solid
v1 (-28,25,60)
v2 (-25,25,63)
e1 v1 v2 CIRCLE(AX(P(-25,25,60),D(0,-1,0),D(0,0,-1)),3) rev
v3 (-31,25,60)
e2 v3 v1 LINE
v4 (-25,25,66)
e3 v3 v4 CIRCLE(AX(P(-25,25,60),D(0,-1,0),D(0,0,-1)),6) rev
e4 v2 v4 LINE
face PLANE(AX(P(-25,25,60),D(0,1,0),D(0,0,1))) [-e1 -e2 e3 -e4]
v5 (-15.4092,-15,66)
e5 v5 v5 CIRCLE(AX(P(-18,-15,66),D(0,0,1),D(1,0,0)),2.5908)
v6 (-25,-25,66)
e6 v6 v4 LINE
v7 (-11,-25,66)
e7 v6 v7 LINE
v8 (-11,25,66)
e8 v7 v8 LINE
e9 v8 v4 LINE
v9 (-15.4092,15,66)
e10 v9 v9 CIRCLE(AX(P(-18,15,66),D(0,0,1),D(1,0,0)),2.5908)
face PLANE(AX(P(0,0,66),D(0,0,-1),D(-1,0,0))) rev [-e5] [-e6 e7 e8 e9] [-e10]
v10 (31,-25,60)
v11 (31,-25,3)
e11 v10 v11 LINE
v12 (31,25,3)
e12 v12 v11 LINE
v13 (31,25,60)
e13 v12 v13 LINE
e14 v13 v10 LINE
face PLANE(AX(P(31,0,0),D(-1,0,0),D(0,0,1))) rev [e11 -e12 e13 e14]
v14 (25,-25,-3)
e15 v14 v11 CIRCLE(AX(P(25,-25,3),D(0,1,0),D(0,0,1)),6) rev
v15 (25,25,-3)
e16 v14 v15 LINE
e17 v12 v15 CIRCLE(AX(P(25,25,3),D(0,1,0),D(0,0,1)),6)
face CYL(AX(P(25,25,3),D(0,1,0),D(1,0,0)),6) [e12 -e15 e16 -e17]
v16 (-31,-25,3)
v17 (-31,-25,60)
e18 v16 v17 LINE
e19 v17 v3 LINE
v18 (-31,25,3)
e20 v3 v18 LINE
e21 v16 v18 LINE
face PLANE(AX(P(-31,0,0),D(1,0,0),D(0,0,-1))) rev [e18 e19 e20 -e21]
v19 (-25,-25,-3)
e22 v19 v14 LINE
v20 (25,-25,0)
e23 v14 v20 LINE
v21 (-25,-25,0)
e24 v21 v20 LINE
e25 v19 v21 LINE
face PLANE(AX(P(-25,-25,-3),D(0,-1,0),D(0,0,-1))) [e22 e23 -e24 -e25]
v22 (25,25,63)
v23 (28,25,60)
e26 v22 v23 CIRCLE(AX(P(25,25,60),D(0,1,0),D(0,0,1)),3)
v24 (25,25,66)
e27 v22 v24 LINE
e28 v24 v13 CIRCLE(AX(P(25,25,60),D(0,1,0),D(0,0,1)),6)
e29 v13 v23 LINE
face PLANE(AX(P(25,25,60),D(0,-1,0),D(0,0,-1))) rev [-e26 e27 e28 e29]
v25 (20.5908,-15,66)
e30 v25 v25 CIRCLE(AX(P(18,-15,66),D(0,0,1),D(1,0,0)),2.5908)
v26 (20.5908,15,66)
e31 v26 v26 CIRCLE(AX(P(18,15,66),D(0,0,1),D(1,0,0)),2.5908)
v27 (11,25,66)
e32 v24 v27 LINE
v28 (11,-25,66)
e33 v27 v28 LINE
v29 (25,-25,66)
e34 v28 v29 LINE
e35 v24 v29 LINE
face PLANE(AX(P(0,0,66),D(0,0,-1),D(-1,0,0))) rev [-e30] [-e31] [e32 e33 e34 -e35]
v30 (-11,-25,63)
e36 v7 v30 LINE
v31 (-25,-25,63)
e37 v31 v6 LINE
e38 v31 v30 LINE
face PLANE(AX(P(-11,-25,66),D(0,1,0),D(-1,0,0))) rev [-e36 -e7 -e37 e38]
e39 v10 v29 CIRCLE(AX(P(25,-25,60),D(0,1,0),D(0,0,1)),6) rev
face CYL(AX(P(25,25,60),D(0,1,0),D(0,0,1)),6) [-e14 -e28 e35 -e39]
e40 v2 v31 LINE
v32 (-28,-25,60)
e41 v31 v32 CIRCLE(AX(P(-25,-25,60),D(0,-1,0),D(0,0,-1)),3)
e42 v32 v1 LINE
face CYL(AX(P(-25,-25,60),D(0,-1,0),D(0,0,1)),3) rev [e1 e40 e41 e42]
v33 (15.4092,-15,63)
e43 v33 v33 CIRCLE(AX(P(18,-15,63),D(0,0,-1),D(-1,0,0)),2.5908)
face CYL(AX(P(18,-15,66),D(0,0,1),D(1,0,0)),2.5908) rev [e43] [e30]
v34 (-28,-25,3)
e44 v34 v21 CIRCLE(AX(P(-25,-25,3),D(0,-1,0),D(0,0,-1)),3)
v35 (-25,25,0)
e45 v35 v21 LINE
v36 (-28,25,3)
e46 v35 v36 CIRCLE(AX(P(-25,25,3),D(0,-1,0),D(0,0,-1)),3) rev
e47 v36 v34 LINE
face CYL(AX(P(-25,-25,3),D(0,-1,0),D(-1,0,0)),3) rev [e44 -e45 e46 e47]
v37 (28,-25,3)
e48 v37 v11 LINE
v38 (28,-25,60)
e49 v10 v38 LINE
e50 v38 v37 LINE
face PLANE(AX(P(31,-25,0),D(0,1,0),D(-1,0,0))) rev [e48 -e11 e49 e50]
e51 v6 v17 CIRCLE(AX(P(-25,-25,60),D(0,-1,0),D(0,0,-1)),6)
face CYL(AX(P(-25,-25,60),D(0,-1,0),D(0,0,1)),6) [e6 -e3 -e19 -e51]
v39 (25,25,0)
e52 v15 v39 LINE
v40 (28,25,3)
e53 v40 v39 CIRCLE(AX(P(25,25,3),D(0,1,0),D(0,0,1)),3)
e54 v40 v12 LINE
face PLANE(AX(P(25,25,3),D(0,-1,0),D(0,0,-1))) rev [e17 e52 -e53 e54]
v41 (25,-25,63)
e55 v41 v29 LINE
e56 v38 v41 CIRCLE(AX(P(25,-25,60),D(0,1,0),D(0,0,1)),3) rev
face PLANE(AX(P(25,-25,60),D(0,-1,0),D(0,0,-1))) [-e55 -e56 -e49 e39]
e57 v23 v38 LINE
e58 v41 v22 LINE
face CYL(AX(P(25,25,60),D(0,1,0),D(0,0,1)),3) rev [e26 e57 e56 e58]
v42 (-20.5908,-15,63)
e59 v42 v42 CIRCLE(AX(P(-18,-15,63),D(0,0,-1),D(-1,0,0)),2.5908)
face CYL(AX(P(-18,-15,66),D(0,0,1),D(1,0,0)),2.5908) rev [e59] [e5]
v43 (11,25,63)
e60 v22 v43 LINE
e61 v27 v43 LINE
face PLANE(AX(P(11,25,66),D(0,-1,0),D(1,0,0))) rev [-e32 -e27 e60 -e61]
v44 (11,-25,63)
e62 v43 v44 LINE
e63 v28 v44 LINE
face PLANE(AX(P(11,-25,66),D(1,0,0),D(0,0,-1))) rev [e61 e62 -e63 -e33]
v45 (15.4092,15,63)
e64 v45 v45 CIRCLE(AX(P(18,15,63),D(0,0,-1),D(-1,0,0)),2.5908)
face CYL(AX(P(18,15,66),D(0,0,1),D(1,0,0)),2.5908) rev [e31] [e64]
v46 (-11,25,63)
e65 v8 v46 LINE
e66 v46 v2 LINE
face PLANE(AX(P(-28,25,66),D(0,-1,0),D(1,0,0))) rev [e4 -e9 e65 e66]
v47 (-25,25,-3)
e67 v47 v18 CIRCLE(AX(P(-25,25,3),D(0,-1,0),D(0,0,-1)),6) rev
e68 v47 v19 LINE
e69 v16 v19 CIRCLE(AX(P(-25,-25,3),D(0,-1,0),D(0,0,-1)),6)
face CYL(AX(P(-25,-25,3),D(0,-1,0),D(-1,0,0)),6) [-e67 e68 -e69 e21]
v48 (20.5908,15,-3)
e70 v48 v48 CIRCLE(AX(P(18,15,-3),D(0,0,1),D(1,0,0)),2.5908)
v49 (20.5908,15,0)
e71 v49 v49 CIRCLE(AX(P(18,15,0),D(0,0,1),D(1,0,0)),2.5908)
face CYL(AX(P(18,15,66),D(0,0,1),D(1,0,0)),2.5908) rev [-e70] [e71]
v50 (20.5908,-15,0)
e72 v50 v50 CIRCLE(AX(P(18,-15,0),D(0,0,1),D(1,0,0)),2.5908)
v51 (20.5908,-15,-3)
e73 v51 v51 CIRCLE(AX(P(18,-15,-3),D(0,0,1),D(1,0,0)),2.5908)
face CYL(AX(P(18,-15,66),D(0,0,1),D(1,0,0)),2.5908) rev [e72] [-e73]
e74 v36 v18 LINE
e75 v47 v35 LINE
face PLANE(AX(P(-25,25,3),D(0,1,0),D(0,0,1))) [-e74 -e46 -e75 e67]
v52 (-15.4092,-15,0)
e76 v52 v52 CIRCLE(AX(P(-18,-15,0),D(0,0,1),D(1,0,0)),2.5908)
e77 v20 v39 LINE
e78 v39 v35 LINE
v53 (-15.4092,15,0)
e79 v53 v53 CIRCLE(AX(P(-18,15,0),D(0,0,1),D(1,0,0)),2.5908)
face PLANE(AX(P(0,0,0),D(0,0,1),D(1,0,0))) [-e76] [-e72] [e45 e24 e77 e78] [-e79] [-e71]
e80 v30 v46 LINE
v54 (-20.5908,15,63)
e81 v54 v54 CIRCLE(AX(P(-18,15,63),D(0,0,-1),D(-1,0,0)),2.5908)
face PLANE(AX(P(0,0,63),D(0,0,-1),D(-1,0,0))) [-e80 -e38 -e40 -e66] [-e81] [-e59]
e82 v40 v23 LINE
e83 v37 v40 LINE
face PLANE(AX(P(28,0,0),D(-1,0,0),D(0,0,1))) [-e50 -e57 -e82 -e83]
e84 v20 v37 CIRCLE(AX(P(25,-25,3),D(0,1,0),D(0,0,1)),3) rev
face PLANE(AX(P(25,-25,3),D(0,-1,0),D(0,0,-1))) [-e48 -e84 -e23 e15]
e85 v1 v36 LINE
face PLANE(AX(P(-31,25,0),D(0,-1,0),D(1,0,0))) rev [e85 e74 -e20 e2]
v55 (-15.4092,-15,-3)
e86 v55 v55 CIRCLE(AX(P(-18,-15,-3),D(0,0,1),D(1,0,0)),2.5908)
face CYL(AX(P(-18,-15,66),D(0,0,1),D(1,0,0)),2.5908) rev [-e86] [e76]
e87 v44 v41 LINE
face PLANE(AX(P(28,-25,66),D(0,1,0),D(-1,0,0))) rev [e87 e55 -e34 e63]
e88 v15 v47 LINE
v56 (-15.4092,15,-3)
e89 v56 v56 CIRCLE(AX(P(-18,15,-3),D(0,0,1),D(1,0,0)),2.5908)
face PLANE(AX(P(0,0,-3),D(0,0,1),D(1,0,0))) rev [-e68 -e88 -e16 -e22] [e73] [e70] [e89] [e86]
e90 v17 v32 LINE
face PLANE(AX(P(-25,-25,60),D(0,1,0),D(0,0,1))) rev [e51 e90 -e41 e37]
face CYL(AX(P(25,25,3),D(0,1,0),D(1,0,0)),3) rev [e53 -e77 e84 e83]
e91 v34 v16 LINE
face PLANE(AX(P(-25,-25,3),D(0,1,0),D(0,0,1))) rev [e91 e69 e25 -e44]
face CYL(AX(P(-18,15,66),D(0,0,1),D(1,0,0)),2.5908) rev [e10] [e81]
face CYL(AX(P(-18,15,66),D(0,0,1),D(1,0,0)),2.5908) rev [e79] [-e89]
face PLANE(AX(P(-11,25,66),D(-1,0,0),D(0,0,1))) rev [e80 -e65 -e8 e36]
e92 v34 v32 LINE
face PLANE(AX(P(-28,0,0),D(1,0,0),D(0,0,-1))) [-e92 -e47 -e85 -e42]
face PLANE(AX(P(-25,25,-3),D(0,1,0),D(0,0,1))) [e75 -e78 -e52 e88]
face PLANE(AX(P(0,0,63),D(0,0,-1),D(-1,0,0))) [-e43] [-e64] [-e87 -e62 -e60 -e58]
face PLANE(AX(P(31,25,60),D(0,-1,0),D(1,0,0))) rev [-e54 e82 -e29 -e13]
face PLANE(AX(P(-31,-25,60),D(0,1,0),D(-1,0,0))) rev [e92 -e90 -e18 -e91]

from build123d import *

# Parameters (mm, degrees)
SKETCH1_W                  = 50
SKETCH1_H                  = 50
BASE_FLANGE1_DEPTH         = 3
EDGE_FLANGE1_DEPTH         = 50
EDGE_FLANGE2_DEPTH         = 50
EDGE_FLANGE3_DEPTH         = 50
EDGE_FLANGE4_DEPTH         = 50
F_6_0_204_DIAMETER_SLOT1_D = 5.1816


# Sheet-metal steps are written as plain solids
with BuildPart() as part:
    # Sketch1 → Base-Flange1 (new body)
    with BuildSketch(Plane.XY):
        Rectangle(SKETCH1_W, SKETCH1_H)
    extrude(amount=-BASE_FLANGE1_DEPTH)

    # Edge-Flange1 section (across the edge) → Edge-Flange1 (add)
    with BuildSketch(Plane(origin=(28, -25, 0), x_dir=(-1, 0, 0), z_dir=(0, 1, 0))):
        with BuildLine():
            Line((-3, 3), (-3, 60))
            Line((-3, 60), (0, 60))
            Line((0, 60), (0, 3))
            ThreePointArc((0, 3), (0.878679656, 0.878679656), (3, 0))
            Line((3, 0), (3, -3))
            ThreePointArc((3, -3), (-1.242640687, -1.242640687), (-3, 3))
        make_face()
    extrude(amount=EDGE_FLANGE1_DEPTH)

    # Edge-Flange2 section (across the edge) → Edge-Flange2 (add)
    with BuildSketch(Plane(origin=(-28, 25, 0), x_dir=(1, 0, 0), z_dir=(0, -1, 0))):
        with BuildLine():
            Line((-3, 3), (-3, 60))
            Line((-3, 60), (0, 60))
            Line((0, 60), (0, 3))
            ThreePointArc((0, 3), (0.878679656, 0.878679656), (3, 0))
            Line((3, 0), (3, -3))
            ThreePointArc((3, -3), (-1.242640687, -1.242640687), (-3, 3))
        make_face()
    extrude(amount=EDGE_FLANGE2_DEPTH)

    # Edge-Flange3 section (across the edge) → Edge-Flange3 (add)
    with BuildSketch(Plane(origin=(-28, 25, 63), x_dir=(0, 0, -1), z_dir=(0, -1, 0))):
        with BuildLine():
            Line((-3, 3), (-3, 17))
            Line((-3, 17), (0, 17))
            Line((0, 17), (0, 3))
            ThreePointArc((0, 3), (0.878679656, 0.878679656), (3, 0))
            Line((3, 0), (3, -3))
            ThreePointArc((3, -3), (-1.242640687, -1.242640687), (-3, 3))
        make_face()
    extrude(amount=EDGE_FLANGE3_DEPTH)

    # Edge-Flange4 section (across the edge) → Edge-Flange4 (add)
    with BuildSketch(Plane(origin=(28, -25, 63), x_dir=(0, 0, -1), z_dir=(0, 1, 0))):
        with BuildLine():
            Line((-3, 3), (-3, 17))
            Line((-3, 17), (0, 17))
            Line((0, 17), (0, 3))
            ThreePointArc((0, 3), (0.878679656, 0.878679656), (3, 0))
            Line((3, 0), (3, -3))
            ThreePointArc((3, -3), (-1.242640687, -1.242640687), (-3, 3))
        make_face()
    extrude(amount=EDGE_FLANGE4_DEPTH)

    # #6 (0.204) Diameter Slot1 (through all)
    with Locations(Plane.XY.offset(66)):
        with Locations((-18, 15), (-18, -15), (18, 15), (18, -15)):
            Hole(F_6_0_204_DIAMETER_SLOT1_D / 2)


solid = part.part
